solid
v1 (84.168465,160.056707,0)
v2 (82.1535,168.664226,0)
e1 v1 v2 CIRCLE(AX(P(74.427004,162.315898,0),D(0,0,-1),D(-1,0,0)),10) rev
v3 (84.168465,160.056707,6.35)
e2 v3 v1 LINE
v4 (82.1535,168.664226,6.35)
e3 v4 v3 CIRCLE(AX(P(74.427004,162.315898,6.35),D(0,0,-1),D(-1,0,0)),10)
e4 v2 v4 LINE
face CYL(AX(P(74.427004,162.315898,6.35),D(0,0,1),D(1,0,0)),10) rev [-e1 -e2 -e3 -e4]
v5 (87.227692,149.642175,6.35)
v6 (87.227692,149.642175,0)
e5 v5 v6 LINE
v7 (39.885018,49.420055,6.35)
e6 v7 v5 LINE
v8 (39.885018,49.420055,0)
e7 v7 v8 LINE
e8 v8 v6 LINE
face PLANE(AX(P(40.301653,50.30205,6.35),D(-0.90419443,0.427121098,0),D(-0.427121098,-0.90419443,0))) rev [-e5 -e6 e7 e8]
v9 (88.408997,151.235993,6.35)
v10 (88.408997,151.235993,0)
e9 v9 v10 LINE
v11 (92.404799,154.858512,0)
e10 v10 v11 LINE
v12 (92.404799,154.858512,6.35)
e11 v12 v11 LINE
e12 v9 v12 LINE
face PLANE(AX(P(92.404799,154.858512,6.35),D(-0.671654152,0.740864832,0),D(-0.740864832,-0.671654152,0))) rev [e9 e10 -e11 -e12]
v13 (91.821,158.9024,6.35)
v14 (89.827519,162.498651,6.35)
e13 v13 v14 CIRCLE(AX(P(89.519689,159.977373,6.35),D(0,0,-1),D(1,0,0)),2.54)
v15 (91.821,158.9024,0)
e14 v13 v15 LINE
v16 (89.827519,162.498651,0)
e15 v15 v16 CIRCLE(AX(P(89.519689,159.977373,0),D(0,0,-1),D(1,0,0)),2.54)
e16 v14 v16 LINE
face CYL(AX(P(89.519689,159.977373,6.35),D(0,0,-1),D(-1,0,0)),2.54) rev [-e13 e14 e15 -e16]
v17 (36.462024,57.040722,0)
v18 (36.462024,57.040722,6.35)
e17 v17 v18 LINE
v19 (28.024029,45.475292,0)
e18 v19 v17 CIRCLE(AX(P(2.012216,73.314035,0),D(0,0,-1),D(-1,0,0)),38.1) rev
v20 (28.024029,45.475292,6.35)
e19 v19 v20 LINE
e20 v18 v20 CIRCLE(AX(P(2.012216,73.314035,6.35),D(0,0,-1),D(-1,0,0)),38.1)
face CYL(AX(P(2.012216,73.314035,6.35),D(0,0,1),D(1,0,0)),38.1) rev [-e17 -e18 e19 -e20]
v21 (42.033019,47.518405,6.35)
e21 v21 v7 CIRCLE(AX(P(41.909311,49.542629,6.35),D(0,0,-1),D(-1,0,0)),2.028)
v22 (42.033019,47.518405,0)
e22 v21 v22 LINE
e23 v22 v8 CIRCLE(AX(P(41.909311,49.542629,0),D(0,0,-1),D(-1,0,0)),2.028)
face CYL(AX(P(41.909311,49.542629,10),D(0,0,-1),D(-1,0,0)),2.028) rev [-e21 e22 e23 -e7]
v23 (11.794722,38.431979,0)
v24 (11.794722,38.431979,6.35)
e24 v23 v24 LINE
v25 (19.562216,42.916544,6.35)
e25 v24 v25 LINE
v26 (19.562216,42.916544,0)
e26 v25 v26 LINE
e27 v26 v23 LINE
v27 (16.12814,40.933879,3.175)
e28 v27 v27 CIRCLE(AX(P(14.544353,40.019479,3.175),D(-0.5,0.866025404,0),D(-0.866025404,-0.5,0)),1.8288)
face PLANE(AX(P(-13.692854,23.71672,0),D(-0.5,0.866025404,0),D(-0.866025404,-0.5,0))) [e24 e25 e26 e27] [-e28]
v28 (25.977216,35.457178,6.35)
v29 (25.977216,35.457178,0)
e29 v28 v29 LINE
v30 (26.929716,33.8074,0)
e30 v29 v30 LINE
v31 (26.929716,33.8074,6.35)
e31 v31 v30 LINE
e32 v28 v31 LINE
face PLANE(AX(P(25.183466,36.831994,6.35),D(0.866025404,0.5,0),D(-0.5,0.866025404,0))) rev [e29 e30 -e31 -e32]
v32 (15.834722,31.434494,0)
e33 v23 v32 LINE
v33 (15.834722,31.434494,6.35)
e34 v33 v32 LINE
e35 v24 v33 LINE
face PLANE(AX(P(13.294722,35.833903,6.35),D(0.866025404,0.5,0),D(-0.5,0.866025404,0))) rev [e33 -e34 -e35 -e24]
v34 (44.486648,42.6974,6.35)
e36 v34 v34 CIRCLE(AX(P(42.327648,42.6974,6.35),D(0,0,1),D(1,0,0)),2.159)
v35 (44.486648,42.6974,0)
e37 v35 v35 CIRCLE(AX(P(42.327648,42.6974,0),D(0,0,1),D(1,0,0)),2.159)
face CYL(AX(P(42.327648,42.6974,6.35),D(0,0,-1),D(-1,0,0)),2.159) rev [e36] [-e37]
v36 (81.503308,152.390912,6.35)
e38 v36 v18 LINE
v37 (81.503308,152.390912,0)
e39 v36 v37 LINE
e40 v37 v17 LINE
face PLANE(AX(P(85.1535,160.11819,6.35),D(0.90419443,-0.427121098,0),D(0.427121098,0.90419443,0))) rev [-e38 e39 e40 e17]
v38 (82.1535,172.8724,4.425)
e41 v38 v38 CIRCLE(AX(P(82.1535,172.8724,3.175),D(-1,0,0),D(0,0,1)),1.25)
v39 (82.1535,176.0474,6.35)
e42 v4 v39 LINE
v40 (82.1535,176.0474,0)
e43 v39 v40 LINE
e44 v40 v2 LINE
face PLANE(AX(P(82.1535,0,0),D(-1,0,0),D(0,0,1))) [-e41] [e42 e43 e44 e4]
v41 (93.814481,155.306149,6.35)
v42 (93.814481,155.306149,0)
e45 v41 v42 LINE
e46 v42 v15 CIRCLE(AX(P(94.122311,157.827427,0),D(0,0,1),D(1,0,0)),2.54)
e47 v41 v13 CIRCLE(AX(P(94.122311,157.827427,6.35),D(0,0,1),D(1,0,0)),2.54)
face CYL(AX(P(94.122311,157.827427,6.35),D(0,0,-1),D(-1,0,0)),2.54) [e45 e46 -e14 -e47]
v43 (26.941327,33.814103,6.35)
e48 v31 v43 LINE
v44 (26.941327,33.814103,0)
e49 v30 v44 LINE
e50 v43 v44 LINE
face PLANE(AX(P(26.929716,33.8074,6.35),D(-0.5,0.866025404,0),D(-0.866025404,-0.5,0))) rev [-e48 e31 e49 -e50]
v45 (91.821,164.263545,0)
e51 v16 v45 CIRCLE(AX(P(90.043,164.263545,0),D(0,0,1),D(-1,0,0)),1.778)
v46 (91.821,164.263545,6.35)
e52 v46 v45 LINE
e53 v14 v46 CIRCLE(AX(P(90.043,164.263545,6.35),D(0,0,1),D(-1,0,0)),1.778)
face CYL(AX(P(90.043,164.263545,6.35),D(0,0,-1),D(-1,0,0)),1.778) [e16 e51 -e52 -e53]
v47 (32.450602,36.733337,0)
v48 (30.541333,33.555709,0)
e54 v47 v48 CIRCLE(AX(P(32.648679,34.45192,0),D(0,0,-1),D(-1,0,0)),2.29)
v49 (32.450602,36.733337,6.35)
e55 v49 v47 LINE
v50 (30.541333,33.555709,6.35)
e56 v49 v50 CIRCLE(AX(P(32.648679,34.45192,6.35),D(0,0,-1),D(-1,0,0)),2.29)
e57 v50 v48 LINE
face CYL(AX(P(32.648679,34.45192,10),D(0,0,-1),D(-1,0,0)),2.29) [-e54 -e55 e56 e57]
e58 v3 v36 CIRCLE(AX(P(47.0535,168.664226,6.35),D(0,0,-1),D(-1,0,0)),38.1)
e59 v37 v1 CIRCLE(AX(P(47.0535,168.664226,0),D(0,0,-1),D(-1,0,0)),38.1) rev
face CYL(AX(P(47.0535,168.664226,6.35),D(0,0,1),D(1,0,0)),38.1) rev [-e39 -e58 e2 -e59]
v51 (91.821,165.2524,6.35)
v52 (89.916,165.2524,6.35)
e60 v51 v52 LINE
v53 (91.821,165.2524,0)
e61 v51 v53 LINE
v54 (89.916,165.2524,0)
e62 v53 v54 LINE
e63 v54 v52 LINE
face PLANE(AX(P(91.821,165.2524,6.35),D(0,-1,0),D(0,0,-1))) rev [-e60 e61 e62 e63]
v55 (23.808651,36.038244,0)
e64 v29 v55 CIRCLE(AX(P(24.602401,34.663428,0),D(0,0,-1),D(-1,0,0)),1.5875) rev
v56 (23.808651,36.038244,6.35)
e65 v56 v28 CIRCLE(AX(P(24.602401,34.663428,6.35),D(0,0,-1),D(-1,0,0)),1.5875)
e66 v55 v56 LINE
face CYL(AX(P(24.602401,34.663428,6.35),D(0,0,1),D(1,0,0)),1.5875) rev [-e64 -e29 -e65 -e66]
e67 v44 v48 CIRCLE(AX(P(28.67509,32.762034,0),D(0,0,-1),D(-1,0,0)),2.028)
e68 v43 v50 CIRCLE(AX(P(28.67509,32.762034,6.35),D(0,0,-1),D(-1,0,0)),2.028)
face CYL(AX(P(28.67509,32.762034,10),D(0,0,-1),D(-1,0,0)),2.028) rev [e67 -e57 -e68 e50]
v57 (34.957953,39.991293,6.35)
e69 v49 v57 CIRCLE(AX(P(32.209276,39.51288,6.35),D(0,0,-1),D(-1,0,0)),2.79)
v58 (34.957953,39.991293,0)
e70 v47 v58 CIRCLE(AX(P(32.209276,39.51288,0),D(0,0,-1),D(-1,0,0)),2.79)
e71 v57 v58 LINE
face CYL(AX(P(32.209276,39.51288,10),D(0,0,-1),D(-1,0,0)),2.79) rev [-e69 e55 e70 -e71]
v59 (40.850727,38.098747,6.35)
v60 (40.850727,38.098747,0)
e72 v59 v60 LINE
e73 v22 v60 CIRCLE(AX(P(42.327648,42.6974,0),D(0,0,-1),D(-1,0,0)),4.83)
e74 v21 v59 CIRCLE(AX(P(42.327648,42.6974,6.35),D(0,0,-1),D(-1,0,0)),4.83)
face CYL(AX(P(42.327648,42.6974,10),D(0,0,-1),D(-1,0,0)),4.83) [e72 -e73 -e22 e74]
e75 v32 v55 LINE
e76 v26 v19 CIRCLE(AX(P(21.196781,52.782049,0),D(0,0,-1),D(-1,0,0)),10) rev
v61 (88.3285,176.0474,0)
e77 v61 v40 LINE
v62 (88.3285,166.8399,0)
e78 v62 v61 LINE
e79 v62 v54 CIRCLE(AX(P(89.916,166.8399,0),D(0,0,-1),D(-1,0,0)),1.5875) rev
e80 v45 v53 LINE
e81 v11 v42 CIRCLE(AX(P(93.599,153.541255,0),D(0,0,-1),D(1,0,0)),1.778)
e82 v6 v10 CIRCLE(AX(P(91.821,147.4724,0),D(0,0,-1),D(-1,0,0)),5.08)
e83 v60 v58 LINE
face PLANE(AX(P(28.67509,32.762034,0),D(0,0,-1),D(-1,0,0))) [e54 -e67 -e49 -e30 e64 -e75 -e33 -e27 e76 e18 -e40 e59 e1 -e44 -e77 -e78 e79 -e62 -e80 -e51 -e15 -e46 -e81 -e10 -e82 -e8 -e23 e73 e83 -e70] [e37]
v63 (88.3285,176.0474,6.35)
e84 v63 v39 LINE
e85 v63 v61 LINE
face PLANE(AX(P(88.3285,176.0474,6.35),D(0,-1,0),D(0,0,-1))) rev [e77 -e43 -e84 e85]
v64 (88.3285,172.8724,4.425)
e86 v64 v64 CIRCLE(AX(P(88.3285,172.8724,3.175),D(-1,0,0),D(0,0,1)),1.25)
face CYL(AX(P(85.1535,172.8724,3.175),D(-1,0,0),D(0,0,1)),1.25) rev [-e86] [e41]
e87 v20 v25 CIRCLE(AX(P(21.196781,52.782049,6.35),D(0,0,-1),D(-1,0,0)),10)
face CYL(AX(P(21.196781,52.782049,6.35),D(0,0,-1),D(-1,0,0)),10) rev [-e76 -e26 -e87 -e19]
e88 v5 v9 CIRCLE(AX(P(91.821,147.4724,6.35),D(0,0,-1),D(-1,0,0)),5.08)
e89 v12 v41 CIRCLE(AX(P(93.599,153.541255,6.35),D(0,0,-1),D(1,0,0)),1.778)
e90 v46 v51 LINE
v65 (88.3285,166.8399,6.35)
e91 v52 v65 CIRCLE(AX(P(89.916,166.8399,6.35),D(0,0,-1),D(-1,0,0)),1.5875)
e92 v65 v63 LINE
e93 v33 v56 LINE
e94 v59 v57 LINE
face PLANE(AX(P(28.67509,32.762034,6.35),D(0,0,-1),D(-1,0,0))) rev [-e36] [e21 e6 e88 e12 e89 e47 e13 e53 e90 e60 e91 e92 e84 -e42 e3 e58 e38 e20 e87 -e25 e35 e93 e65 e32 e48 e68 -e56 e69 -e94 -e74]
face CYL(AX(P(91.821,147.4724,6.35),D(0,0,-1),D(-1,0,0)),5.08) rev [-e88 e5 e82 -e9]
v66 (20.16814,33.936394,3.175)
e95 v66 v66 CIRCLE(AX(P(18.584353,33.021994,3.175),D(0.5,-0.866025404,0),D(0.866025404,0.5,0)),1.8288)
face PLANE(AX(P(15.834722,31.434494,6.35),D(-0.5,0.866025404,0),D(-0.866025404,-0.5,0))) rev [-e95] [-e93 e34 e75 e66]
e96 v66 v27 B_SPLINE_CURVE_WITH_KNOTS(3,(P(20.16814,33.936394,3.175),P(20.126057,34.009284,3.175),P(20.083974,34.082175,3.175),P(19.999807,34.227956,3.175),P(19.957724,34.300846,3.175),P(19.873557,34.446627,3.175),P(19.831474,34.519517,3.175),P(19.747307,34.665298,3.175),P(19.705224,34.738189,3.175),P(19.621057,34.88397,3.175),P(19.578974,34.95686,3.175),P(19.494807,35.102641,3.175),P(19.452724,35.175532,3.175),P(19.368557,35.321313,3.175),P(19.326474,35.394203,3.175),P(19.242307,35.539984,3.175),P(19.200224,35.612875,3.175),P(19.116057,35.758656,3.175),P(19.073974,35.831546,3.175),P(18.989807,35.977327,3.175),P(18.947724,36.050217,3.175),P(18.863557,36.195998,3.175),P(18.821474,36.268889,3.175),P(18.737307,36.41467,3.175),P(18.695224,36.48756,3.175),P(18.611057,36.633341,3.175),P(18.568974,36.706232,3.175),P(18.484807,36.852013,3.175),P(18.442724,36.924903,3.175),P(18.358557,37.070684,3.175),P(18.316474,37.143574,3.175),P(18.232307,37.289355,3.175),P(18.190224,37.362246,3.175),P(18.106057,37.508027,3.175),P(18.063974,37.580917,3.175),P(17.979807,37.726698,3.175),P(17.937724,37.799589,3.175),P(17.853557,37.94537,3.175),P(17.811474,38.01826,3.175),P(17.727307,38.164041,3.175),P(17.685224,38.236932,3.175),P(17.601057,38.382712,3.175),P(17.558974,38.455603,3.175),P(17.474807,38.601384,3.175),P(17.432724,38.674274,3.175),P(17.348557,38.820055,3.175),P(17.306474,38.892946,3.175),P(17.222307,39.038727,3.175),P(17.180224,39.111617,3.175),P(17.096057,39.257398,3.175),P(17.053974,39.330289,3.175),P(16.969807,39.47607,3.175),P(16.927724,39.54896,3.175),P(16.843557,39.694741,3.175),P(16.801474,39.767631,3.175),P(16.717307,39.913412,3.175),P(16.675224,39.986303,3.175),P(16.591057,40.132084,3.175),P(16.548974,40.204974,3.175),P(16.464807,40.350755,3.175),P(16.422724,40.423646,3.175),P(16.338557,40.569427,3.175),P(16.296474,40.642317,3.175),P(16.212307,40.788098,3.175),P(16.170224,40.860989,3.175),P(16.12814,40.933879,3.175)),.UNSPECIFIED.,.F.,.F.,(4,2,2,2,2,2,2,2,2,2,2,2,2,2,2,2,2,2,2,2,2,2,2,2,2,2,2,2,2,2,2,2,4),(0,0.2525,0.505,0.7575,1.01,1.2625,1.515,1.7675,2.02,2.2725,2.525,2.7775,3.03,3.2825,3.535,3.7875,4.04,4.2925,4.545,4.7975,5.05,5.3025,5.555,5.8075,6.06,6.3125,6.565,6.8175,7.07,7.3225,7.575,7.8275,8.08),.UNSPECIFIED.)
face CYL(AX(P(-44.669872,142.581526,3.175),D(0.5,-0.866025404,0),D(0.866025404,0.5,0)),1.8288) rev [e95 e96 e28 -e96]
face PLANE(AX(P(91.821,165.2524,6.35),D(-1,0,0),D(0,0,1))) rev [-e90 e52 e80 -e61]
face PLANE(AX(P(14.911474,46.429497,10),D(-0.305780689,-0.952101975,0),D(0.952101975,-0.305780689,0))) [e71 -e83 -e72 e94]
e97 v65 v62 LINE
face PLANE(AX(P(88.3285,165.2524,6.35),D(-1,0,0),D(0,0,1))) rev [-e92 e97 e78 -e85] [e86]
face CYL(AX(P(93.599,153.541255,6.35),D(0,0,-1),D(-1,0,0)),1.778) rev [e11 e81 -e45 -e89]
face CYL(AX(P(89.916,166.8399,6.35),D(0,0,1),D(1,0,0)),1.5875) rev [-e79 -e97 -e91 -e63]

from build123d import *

# Parameters (mm, degrees)
SKETCH1_R                 = 2.159
BOSS_EXTRUDE1_DEPTH       = 6.35
SKETCH2_R                 = 1.8288
CUT_EXTRUDE1_DEPTH        = 192.647335654
SKETCH3_R                 = 0.635
CUT_EXTRUDE2_DEPTH        = 192.476049021
FILLET1_R                 = 1.5875
FILLET2_R                 = 38.1
M3X0_5_TAPPED_HOLE1_D     = 2.5
M3X0_5_TAPPED_HOLE1_DEPTH = 7.50062
M3X0_5_TAPPED_HOLE1_TIP   = 0.751075774
CORTAR_EXTRUIR1_DEPTH     = 10
CROQUIS8_W                = 8.969129367
CROQUIS8_H                = 6.35
CROQUIS8_R                = 1.8288
SALIENTE_EXTRUIR3_DEPTH   = 3
CROQUIS7_W                = 6.35
CROQUIS7_H                = 7.383174339
CROQUIS7_R                = 1.25
SALIENTE_EXTRUIR4_DEPTH   = 3
REDONDEO1_R               = 10


with BuildPart() as part:
    # Sketch1 → Boss-Extrude1 (new body)
    with BuildSketch(Plane.XY):
        with BuildLine():
            Line((15.834722261, 31.434493723), (25.183466494, 36.831993723))
            Line((25.183466494, 36.831993723), (26.929716494, 33.8074))
            Line((26.929716494, 33.8074), (27.78608986, 34.301827393))
            ThreePointArc((27.78608986, 34.301827393), (29.23868298, 34.44834582), (30.311273673, 33.457869357))
            ThreePointArc((30.311273673, 33.457869357), (34.825897025, 33.143744407), (32.428977808, 36.9824))
            ThreePointArc((32.428977808, 36.9824), (30.032058591, 40.821055593), (34.546681944, 40.506930643))
            ThreePointArc((34.546681944, 40.506930643), (34.984344673, 39.889437479), (35.639187691, 39.509928464))
            Line((35.639187691, 39.509928464), (40.774282272, 37.860721969))
            ThreePointArc((40.774282272, 37.860721969), (47.368100791, 42.064756802), (42.017768622, 47.767939879))
            ThreePointArc((42.017768622, 47.767939879), (40.437125748, 48.5456558), (40.301653082, 50.302050149))
            Line((40.301653082, 50.302050149), (87.227692295, 149.642175178))
            ThreePointArc((87.227692295, 149.642175178), (87.739785188, 150.497310852), (88.408996906, 151.235993347))
            Line((88.408996906, 151.235993347), (92.404798917, 154.858512458))
            ThreePointArc((92.404798917, 154.858512458), (93.060884875, 155.23586864), (93.814481006, 155.3061491))
            ThreePointArc((93.814481006, 155.3061491), (96.343832869, 159.058865136), (91.821, 158.9024))
            ThreePointArc((91.821, 158.9024), (87.298167131, 158.745934864), (89.827518994, 162.4986509))
            ThreePointArc((89.827518994, 162.4986509), (91.22159212, 162.932303457), (91.821, 164.263545213))
            Line((91.821, 164.263545213), (91.821, 165.2524))
            Line((91.821, 165.2524), (88.3285, 165.2524))
            Line((88.3285, 165.2524), (88.3285, 176.0474))
            Line((88.3285, 176.0474), (85.1535, 176.0474))
            Line((85.1535, 176.0474), (85.1535, 160.118189826))
            Line((85.1535, 160.118189826), (31.375529243, 46.272861553))
            Line((31.375529243, 46.272861553), (13.294722261, 35.833902774))
            Line((13.294722261, 35.833902774), (15.834722261, 31.434493723))
        make_face()
        with Locations((42.327648174, 42.6974)):
            Circle(SKETCH1_R, mode=Mode.SUBTRACT)
    extrude(amount=BOSS_EXTRUDE1_DEPTH)

    # Sketch2 → Cut-Extrude1 (cut, through all)
    with BuildSketch(Plane(origin=(-9.652854494, 16.719234422, 0), x_dir=(-0.8660254037844398, -0.49999999999999806, 0), z_dir=(0.499999999999998, -0.8660254037844397, 0))):
        with Locations(Location((-32.605518601, -3.175, 0), (0, 0, 180))):
            Circle(SKETCH2_R)
    extrude(amount=-CUT_EXTRUDE1_DEPTH, mode=Mode.SUBTRACT)

    # Sketch3 → Cut-Extrude2 (cut, through all)
    with BuildSketch(Plane(origin=(88.3285, 0, 0), x_dir=(0, 0, -1), z_dir=(1, 0, 0))):
        with Locations((-3.175, 172.8724)):
            Circle(SKETCH3_R)
    extrude(amount=-CUT_EXTRUDE2_DEPTH, mode=Mode.SUBTRACT)

    # Fillet1
    fillet1_edges = [part.edges().sort_by_distance(p)[0] for p in [
        (88.3285, 165.2524, 3.175),
        (25.183466494, 36.831993723, 3.175),
    ]]
    fillet(fillet1_edges, radius=FILLET1_R)

    # Fillet2
    fillet2_edges = [part.edges().sort_by_distance(p)[0] for p in [
        (31.375529243, 46.272861553, 3.175),
        (85.1535, 160.118189826, 3.175),
    ]]
    fillet(fillet2_edges, radius=FILLET2_R)

    # M3x0.5 Tapped Hole1
    with Locations(Plane.ZY.offset(-85.1535)):
        with Locations((3.175, 172.8724)):
            Hole(M3X0_5_TAPPED_HOLE1_D / 2, depth=M3X0_5_TAPPED_HOLE1_DEPTH)
            with Locations((0, 0, -(M3X0_5_TAPPED_HOLE1_DEPTH + M3X0_5_TAPPED_HOLE1_TIP / 2))):  # 118° drill point
                Cone(0, M3X0_5_TAPPED_HOLE1_D / 2, M3X0_5_TAPPED_HOLE1_TIP, mode=Mode.SUBTRACT)

    # Croquis1 → Cortar-Extruir1 (cut)
    with BuildSketch(Plane(origin=(0, 0, 0), x_dir=(-1, 0, 0), z_dir=(0, 0, -1))):
        with BuildLine():
            ThreePointArc((-42.017768622, 47.767939879), (-47.368100791, 42.064756802), (-40.774282272, 37.860721969))
            Line((-40.774282272, 37.860721969), (-35.639187691, 39.509928464))
            ThreePointArc((-35.639187691, 39.509928464), (-34.984344673, 39.889437479), (-34.546681944, 40.506930643))
            ThreePointArc((-34.546681944, 40.506930643), (-30.032058591, 40.821055593), (-32.428977808, 36.9824))
            ThreePointArc((-32.428977808, 36.9824), (-34.825897025, 33.143744407), (-30.311273673, 33.457869357))
            ThreePointArc((-30.311273673, 33.457869357), (-29.23868298, 34.44834582), (-27.78608986, 34.301827393))
            Line((-27.78608986, 34.301827393), (-26.94132658, 33.814103086))
            ThreePointArc((-26.94132658, 33.814103086), (-28.820278114, 34.784830402), (-30.541333264, 33.555708942))
            ThreePointArc((-30.541333264, 33.555708942), (-34.611603925, 33.272501802), (-32.450601953, 36.733336963))
            ThreePointArc((-32.450601953, 36.733336963), (-29.998259186, 41.214498053), (-34.957952736, 39.991293387))
            Line((-34.957952736, 39.991293387), (-40.850727445, 38.098747463))
            ThreePointArc((-40.850727445, 38.098747463), (-47.12004702, 42.095890817), (-42.0330186, 47.518405436))
            ThreePointArc((-42.0330186, 47.518405436), (-40.565017979, 48.024188561), (-39.885018398, 49.420054945))
            Line((-39.885018398, 49.420054945), (-40.301653082, 50.302050149))
            ThreePointArc((-40.301653082, 50.302050149), (-40.437125748, 48.5456558), (-42.017768622, 47.767939879))
        make_face()
    extrude(amount=-CORTAR_EXTRUIR1_DEPTH, mode=Mode.SUBTRACT)

    # Croquis8 → Saliente-Extruir3 (add)
    with BuildSketch(Plane(origin=(-12.192854494, 21.118643474, 0), x_dir=(0.8660254037844494, 0.4999999999999815, 0), z_dir=(-0.49999999999998146, 0.8660254037844493, 0))):
        with Locations((33.915083284, -3.175)):
            Rectangle(CROQUIS8_W, CROQUIS8_H)
        with Locations((32.605518601, -3.175)):
            Circle(CROQUIS8_R, mode=Mode.SUBTRACT)
    extrude(amount=SALIENTE_EXTRUIR3_DEPTH)

    # Croquis7 → Saliente-Extruir4 (add)
    with BuildSketch(Plane.ZY.offset(-85.1535)):
        with Locations((3.175, 172.355812831)):
            Rectangle(CROQUIS7_W, CROQUIS7_H)
        with Locations((3.175, 172.8724)):
            Circle(CROQUIS7_R, mode=Mode.SUBTRACT)
    extrude(amount=SALIENTE_EXTRUIR4_DEPTH)

    # Redondeo1
    # the kernel refuses this fillet: 10 mm, written as the material it adds along each edge
    with BuildSketch(Plane(origin=(21.062216142, 40.318467458, 0), x_dir=(-0.49999999999998396, 0.8660254037844479, 0), z_dir=(0, 0, 1))) as redondeo1_piece_1:
        with BuildLine():
            CenterArc((10.726495726, -6.348327637), REDONDEO1_R, 140.592418032, 52.464514334)
            Line((0.985035131, -8.607518967), (0.790205919, -8.652702794))
            ThreePointArc((0.790205919, -8.652702794), (0.048356716, -4.354588769), (-0.2, 0))
            Line((-0.2, 0), (0, 0.2))
            ThreePointArc((0, 0.2), (1.5, 0.2), (2.845470085, 0.126966553))
            Line((2.845470085, 0.126966553), (3, 0))
        make_face()
    extrude(amount=6.35)
    with BuildSketch(Plane(origin=(85.1535, 168.664225661, 0), x_dir=(-0.1136968347067967, -0.9935154904568199, 0), z_dir=(0, 0, 1))) as redondeo1_piece_2:
        with BuildLine():
            CenterArc((7.526730458, -9.935154905), REDONDEO1_R, 83.471533817, 52.464514334)
            Line((0.341090504, -2.980546471), (0.197377705, -2.841454303))
            ThreePointArc((0.197377705, -2.841454303), (-0.028157846, -1.513012603), (-0.198703098, -0.022739367))
            Line((-0.198703098, -0.022739367), (-0.022739367, 0.198703098))
            ThreePointArc((-0.022739367, 0.198703098), (4.331849402, 0.447059814), (8.686438172, 0.198703098))
            Line((8.686438172, 0.198703098), (8.663698805, 0))
        make_face()
    extrude(amount=6.35)


solid = part.part
